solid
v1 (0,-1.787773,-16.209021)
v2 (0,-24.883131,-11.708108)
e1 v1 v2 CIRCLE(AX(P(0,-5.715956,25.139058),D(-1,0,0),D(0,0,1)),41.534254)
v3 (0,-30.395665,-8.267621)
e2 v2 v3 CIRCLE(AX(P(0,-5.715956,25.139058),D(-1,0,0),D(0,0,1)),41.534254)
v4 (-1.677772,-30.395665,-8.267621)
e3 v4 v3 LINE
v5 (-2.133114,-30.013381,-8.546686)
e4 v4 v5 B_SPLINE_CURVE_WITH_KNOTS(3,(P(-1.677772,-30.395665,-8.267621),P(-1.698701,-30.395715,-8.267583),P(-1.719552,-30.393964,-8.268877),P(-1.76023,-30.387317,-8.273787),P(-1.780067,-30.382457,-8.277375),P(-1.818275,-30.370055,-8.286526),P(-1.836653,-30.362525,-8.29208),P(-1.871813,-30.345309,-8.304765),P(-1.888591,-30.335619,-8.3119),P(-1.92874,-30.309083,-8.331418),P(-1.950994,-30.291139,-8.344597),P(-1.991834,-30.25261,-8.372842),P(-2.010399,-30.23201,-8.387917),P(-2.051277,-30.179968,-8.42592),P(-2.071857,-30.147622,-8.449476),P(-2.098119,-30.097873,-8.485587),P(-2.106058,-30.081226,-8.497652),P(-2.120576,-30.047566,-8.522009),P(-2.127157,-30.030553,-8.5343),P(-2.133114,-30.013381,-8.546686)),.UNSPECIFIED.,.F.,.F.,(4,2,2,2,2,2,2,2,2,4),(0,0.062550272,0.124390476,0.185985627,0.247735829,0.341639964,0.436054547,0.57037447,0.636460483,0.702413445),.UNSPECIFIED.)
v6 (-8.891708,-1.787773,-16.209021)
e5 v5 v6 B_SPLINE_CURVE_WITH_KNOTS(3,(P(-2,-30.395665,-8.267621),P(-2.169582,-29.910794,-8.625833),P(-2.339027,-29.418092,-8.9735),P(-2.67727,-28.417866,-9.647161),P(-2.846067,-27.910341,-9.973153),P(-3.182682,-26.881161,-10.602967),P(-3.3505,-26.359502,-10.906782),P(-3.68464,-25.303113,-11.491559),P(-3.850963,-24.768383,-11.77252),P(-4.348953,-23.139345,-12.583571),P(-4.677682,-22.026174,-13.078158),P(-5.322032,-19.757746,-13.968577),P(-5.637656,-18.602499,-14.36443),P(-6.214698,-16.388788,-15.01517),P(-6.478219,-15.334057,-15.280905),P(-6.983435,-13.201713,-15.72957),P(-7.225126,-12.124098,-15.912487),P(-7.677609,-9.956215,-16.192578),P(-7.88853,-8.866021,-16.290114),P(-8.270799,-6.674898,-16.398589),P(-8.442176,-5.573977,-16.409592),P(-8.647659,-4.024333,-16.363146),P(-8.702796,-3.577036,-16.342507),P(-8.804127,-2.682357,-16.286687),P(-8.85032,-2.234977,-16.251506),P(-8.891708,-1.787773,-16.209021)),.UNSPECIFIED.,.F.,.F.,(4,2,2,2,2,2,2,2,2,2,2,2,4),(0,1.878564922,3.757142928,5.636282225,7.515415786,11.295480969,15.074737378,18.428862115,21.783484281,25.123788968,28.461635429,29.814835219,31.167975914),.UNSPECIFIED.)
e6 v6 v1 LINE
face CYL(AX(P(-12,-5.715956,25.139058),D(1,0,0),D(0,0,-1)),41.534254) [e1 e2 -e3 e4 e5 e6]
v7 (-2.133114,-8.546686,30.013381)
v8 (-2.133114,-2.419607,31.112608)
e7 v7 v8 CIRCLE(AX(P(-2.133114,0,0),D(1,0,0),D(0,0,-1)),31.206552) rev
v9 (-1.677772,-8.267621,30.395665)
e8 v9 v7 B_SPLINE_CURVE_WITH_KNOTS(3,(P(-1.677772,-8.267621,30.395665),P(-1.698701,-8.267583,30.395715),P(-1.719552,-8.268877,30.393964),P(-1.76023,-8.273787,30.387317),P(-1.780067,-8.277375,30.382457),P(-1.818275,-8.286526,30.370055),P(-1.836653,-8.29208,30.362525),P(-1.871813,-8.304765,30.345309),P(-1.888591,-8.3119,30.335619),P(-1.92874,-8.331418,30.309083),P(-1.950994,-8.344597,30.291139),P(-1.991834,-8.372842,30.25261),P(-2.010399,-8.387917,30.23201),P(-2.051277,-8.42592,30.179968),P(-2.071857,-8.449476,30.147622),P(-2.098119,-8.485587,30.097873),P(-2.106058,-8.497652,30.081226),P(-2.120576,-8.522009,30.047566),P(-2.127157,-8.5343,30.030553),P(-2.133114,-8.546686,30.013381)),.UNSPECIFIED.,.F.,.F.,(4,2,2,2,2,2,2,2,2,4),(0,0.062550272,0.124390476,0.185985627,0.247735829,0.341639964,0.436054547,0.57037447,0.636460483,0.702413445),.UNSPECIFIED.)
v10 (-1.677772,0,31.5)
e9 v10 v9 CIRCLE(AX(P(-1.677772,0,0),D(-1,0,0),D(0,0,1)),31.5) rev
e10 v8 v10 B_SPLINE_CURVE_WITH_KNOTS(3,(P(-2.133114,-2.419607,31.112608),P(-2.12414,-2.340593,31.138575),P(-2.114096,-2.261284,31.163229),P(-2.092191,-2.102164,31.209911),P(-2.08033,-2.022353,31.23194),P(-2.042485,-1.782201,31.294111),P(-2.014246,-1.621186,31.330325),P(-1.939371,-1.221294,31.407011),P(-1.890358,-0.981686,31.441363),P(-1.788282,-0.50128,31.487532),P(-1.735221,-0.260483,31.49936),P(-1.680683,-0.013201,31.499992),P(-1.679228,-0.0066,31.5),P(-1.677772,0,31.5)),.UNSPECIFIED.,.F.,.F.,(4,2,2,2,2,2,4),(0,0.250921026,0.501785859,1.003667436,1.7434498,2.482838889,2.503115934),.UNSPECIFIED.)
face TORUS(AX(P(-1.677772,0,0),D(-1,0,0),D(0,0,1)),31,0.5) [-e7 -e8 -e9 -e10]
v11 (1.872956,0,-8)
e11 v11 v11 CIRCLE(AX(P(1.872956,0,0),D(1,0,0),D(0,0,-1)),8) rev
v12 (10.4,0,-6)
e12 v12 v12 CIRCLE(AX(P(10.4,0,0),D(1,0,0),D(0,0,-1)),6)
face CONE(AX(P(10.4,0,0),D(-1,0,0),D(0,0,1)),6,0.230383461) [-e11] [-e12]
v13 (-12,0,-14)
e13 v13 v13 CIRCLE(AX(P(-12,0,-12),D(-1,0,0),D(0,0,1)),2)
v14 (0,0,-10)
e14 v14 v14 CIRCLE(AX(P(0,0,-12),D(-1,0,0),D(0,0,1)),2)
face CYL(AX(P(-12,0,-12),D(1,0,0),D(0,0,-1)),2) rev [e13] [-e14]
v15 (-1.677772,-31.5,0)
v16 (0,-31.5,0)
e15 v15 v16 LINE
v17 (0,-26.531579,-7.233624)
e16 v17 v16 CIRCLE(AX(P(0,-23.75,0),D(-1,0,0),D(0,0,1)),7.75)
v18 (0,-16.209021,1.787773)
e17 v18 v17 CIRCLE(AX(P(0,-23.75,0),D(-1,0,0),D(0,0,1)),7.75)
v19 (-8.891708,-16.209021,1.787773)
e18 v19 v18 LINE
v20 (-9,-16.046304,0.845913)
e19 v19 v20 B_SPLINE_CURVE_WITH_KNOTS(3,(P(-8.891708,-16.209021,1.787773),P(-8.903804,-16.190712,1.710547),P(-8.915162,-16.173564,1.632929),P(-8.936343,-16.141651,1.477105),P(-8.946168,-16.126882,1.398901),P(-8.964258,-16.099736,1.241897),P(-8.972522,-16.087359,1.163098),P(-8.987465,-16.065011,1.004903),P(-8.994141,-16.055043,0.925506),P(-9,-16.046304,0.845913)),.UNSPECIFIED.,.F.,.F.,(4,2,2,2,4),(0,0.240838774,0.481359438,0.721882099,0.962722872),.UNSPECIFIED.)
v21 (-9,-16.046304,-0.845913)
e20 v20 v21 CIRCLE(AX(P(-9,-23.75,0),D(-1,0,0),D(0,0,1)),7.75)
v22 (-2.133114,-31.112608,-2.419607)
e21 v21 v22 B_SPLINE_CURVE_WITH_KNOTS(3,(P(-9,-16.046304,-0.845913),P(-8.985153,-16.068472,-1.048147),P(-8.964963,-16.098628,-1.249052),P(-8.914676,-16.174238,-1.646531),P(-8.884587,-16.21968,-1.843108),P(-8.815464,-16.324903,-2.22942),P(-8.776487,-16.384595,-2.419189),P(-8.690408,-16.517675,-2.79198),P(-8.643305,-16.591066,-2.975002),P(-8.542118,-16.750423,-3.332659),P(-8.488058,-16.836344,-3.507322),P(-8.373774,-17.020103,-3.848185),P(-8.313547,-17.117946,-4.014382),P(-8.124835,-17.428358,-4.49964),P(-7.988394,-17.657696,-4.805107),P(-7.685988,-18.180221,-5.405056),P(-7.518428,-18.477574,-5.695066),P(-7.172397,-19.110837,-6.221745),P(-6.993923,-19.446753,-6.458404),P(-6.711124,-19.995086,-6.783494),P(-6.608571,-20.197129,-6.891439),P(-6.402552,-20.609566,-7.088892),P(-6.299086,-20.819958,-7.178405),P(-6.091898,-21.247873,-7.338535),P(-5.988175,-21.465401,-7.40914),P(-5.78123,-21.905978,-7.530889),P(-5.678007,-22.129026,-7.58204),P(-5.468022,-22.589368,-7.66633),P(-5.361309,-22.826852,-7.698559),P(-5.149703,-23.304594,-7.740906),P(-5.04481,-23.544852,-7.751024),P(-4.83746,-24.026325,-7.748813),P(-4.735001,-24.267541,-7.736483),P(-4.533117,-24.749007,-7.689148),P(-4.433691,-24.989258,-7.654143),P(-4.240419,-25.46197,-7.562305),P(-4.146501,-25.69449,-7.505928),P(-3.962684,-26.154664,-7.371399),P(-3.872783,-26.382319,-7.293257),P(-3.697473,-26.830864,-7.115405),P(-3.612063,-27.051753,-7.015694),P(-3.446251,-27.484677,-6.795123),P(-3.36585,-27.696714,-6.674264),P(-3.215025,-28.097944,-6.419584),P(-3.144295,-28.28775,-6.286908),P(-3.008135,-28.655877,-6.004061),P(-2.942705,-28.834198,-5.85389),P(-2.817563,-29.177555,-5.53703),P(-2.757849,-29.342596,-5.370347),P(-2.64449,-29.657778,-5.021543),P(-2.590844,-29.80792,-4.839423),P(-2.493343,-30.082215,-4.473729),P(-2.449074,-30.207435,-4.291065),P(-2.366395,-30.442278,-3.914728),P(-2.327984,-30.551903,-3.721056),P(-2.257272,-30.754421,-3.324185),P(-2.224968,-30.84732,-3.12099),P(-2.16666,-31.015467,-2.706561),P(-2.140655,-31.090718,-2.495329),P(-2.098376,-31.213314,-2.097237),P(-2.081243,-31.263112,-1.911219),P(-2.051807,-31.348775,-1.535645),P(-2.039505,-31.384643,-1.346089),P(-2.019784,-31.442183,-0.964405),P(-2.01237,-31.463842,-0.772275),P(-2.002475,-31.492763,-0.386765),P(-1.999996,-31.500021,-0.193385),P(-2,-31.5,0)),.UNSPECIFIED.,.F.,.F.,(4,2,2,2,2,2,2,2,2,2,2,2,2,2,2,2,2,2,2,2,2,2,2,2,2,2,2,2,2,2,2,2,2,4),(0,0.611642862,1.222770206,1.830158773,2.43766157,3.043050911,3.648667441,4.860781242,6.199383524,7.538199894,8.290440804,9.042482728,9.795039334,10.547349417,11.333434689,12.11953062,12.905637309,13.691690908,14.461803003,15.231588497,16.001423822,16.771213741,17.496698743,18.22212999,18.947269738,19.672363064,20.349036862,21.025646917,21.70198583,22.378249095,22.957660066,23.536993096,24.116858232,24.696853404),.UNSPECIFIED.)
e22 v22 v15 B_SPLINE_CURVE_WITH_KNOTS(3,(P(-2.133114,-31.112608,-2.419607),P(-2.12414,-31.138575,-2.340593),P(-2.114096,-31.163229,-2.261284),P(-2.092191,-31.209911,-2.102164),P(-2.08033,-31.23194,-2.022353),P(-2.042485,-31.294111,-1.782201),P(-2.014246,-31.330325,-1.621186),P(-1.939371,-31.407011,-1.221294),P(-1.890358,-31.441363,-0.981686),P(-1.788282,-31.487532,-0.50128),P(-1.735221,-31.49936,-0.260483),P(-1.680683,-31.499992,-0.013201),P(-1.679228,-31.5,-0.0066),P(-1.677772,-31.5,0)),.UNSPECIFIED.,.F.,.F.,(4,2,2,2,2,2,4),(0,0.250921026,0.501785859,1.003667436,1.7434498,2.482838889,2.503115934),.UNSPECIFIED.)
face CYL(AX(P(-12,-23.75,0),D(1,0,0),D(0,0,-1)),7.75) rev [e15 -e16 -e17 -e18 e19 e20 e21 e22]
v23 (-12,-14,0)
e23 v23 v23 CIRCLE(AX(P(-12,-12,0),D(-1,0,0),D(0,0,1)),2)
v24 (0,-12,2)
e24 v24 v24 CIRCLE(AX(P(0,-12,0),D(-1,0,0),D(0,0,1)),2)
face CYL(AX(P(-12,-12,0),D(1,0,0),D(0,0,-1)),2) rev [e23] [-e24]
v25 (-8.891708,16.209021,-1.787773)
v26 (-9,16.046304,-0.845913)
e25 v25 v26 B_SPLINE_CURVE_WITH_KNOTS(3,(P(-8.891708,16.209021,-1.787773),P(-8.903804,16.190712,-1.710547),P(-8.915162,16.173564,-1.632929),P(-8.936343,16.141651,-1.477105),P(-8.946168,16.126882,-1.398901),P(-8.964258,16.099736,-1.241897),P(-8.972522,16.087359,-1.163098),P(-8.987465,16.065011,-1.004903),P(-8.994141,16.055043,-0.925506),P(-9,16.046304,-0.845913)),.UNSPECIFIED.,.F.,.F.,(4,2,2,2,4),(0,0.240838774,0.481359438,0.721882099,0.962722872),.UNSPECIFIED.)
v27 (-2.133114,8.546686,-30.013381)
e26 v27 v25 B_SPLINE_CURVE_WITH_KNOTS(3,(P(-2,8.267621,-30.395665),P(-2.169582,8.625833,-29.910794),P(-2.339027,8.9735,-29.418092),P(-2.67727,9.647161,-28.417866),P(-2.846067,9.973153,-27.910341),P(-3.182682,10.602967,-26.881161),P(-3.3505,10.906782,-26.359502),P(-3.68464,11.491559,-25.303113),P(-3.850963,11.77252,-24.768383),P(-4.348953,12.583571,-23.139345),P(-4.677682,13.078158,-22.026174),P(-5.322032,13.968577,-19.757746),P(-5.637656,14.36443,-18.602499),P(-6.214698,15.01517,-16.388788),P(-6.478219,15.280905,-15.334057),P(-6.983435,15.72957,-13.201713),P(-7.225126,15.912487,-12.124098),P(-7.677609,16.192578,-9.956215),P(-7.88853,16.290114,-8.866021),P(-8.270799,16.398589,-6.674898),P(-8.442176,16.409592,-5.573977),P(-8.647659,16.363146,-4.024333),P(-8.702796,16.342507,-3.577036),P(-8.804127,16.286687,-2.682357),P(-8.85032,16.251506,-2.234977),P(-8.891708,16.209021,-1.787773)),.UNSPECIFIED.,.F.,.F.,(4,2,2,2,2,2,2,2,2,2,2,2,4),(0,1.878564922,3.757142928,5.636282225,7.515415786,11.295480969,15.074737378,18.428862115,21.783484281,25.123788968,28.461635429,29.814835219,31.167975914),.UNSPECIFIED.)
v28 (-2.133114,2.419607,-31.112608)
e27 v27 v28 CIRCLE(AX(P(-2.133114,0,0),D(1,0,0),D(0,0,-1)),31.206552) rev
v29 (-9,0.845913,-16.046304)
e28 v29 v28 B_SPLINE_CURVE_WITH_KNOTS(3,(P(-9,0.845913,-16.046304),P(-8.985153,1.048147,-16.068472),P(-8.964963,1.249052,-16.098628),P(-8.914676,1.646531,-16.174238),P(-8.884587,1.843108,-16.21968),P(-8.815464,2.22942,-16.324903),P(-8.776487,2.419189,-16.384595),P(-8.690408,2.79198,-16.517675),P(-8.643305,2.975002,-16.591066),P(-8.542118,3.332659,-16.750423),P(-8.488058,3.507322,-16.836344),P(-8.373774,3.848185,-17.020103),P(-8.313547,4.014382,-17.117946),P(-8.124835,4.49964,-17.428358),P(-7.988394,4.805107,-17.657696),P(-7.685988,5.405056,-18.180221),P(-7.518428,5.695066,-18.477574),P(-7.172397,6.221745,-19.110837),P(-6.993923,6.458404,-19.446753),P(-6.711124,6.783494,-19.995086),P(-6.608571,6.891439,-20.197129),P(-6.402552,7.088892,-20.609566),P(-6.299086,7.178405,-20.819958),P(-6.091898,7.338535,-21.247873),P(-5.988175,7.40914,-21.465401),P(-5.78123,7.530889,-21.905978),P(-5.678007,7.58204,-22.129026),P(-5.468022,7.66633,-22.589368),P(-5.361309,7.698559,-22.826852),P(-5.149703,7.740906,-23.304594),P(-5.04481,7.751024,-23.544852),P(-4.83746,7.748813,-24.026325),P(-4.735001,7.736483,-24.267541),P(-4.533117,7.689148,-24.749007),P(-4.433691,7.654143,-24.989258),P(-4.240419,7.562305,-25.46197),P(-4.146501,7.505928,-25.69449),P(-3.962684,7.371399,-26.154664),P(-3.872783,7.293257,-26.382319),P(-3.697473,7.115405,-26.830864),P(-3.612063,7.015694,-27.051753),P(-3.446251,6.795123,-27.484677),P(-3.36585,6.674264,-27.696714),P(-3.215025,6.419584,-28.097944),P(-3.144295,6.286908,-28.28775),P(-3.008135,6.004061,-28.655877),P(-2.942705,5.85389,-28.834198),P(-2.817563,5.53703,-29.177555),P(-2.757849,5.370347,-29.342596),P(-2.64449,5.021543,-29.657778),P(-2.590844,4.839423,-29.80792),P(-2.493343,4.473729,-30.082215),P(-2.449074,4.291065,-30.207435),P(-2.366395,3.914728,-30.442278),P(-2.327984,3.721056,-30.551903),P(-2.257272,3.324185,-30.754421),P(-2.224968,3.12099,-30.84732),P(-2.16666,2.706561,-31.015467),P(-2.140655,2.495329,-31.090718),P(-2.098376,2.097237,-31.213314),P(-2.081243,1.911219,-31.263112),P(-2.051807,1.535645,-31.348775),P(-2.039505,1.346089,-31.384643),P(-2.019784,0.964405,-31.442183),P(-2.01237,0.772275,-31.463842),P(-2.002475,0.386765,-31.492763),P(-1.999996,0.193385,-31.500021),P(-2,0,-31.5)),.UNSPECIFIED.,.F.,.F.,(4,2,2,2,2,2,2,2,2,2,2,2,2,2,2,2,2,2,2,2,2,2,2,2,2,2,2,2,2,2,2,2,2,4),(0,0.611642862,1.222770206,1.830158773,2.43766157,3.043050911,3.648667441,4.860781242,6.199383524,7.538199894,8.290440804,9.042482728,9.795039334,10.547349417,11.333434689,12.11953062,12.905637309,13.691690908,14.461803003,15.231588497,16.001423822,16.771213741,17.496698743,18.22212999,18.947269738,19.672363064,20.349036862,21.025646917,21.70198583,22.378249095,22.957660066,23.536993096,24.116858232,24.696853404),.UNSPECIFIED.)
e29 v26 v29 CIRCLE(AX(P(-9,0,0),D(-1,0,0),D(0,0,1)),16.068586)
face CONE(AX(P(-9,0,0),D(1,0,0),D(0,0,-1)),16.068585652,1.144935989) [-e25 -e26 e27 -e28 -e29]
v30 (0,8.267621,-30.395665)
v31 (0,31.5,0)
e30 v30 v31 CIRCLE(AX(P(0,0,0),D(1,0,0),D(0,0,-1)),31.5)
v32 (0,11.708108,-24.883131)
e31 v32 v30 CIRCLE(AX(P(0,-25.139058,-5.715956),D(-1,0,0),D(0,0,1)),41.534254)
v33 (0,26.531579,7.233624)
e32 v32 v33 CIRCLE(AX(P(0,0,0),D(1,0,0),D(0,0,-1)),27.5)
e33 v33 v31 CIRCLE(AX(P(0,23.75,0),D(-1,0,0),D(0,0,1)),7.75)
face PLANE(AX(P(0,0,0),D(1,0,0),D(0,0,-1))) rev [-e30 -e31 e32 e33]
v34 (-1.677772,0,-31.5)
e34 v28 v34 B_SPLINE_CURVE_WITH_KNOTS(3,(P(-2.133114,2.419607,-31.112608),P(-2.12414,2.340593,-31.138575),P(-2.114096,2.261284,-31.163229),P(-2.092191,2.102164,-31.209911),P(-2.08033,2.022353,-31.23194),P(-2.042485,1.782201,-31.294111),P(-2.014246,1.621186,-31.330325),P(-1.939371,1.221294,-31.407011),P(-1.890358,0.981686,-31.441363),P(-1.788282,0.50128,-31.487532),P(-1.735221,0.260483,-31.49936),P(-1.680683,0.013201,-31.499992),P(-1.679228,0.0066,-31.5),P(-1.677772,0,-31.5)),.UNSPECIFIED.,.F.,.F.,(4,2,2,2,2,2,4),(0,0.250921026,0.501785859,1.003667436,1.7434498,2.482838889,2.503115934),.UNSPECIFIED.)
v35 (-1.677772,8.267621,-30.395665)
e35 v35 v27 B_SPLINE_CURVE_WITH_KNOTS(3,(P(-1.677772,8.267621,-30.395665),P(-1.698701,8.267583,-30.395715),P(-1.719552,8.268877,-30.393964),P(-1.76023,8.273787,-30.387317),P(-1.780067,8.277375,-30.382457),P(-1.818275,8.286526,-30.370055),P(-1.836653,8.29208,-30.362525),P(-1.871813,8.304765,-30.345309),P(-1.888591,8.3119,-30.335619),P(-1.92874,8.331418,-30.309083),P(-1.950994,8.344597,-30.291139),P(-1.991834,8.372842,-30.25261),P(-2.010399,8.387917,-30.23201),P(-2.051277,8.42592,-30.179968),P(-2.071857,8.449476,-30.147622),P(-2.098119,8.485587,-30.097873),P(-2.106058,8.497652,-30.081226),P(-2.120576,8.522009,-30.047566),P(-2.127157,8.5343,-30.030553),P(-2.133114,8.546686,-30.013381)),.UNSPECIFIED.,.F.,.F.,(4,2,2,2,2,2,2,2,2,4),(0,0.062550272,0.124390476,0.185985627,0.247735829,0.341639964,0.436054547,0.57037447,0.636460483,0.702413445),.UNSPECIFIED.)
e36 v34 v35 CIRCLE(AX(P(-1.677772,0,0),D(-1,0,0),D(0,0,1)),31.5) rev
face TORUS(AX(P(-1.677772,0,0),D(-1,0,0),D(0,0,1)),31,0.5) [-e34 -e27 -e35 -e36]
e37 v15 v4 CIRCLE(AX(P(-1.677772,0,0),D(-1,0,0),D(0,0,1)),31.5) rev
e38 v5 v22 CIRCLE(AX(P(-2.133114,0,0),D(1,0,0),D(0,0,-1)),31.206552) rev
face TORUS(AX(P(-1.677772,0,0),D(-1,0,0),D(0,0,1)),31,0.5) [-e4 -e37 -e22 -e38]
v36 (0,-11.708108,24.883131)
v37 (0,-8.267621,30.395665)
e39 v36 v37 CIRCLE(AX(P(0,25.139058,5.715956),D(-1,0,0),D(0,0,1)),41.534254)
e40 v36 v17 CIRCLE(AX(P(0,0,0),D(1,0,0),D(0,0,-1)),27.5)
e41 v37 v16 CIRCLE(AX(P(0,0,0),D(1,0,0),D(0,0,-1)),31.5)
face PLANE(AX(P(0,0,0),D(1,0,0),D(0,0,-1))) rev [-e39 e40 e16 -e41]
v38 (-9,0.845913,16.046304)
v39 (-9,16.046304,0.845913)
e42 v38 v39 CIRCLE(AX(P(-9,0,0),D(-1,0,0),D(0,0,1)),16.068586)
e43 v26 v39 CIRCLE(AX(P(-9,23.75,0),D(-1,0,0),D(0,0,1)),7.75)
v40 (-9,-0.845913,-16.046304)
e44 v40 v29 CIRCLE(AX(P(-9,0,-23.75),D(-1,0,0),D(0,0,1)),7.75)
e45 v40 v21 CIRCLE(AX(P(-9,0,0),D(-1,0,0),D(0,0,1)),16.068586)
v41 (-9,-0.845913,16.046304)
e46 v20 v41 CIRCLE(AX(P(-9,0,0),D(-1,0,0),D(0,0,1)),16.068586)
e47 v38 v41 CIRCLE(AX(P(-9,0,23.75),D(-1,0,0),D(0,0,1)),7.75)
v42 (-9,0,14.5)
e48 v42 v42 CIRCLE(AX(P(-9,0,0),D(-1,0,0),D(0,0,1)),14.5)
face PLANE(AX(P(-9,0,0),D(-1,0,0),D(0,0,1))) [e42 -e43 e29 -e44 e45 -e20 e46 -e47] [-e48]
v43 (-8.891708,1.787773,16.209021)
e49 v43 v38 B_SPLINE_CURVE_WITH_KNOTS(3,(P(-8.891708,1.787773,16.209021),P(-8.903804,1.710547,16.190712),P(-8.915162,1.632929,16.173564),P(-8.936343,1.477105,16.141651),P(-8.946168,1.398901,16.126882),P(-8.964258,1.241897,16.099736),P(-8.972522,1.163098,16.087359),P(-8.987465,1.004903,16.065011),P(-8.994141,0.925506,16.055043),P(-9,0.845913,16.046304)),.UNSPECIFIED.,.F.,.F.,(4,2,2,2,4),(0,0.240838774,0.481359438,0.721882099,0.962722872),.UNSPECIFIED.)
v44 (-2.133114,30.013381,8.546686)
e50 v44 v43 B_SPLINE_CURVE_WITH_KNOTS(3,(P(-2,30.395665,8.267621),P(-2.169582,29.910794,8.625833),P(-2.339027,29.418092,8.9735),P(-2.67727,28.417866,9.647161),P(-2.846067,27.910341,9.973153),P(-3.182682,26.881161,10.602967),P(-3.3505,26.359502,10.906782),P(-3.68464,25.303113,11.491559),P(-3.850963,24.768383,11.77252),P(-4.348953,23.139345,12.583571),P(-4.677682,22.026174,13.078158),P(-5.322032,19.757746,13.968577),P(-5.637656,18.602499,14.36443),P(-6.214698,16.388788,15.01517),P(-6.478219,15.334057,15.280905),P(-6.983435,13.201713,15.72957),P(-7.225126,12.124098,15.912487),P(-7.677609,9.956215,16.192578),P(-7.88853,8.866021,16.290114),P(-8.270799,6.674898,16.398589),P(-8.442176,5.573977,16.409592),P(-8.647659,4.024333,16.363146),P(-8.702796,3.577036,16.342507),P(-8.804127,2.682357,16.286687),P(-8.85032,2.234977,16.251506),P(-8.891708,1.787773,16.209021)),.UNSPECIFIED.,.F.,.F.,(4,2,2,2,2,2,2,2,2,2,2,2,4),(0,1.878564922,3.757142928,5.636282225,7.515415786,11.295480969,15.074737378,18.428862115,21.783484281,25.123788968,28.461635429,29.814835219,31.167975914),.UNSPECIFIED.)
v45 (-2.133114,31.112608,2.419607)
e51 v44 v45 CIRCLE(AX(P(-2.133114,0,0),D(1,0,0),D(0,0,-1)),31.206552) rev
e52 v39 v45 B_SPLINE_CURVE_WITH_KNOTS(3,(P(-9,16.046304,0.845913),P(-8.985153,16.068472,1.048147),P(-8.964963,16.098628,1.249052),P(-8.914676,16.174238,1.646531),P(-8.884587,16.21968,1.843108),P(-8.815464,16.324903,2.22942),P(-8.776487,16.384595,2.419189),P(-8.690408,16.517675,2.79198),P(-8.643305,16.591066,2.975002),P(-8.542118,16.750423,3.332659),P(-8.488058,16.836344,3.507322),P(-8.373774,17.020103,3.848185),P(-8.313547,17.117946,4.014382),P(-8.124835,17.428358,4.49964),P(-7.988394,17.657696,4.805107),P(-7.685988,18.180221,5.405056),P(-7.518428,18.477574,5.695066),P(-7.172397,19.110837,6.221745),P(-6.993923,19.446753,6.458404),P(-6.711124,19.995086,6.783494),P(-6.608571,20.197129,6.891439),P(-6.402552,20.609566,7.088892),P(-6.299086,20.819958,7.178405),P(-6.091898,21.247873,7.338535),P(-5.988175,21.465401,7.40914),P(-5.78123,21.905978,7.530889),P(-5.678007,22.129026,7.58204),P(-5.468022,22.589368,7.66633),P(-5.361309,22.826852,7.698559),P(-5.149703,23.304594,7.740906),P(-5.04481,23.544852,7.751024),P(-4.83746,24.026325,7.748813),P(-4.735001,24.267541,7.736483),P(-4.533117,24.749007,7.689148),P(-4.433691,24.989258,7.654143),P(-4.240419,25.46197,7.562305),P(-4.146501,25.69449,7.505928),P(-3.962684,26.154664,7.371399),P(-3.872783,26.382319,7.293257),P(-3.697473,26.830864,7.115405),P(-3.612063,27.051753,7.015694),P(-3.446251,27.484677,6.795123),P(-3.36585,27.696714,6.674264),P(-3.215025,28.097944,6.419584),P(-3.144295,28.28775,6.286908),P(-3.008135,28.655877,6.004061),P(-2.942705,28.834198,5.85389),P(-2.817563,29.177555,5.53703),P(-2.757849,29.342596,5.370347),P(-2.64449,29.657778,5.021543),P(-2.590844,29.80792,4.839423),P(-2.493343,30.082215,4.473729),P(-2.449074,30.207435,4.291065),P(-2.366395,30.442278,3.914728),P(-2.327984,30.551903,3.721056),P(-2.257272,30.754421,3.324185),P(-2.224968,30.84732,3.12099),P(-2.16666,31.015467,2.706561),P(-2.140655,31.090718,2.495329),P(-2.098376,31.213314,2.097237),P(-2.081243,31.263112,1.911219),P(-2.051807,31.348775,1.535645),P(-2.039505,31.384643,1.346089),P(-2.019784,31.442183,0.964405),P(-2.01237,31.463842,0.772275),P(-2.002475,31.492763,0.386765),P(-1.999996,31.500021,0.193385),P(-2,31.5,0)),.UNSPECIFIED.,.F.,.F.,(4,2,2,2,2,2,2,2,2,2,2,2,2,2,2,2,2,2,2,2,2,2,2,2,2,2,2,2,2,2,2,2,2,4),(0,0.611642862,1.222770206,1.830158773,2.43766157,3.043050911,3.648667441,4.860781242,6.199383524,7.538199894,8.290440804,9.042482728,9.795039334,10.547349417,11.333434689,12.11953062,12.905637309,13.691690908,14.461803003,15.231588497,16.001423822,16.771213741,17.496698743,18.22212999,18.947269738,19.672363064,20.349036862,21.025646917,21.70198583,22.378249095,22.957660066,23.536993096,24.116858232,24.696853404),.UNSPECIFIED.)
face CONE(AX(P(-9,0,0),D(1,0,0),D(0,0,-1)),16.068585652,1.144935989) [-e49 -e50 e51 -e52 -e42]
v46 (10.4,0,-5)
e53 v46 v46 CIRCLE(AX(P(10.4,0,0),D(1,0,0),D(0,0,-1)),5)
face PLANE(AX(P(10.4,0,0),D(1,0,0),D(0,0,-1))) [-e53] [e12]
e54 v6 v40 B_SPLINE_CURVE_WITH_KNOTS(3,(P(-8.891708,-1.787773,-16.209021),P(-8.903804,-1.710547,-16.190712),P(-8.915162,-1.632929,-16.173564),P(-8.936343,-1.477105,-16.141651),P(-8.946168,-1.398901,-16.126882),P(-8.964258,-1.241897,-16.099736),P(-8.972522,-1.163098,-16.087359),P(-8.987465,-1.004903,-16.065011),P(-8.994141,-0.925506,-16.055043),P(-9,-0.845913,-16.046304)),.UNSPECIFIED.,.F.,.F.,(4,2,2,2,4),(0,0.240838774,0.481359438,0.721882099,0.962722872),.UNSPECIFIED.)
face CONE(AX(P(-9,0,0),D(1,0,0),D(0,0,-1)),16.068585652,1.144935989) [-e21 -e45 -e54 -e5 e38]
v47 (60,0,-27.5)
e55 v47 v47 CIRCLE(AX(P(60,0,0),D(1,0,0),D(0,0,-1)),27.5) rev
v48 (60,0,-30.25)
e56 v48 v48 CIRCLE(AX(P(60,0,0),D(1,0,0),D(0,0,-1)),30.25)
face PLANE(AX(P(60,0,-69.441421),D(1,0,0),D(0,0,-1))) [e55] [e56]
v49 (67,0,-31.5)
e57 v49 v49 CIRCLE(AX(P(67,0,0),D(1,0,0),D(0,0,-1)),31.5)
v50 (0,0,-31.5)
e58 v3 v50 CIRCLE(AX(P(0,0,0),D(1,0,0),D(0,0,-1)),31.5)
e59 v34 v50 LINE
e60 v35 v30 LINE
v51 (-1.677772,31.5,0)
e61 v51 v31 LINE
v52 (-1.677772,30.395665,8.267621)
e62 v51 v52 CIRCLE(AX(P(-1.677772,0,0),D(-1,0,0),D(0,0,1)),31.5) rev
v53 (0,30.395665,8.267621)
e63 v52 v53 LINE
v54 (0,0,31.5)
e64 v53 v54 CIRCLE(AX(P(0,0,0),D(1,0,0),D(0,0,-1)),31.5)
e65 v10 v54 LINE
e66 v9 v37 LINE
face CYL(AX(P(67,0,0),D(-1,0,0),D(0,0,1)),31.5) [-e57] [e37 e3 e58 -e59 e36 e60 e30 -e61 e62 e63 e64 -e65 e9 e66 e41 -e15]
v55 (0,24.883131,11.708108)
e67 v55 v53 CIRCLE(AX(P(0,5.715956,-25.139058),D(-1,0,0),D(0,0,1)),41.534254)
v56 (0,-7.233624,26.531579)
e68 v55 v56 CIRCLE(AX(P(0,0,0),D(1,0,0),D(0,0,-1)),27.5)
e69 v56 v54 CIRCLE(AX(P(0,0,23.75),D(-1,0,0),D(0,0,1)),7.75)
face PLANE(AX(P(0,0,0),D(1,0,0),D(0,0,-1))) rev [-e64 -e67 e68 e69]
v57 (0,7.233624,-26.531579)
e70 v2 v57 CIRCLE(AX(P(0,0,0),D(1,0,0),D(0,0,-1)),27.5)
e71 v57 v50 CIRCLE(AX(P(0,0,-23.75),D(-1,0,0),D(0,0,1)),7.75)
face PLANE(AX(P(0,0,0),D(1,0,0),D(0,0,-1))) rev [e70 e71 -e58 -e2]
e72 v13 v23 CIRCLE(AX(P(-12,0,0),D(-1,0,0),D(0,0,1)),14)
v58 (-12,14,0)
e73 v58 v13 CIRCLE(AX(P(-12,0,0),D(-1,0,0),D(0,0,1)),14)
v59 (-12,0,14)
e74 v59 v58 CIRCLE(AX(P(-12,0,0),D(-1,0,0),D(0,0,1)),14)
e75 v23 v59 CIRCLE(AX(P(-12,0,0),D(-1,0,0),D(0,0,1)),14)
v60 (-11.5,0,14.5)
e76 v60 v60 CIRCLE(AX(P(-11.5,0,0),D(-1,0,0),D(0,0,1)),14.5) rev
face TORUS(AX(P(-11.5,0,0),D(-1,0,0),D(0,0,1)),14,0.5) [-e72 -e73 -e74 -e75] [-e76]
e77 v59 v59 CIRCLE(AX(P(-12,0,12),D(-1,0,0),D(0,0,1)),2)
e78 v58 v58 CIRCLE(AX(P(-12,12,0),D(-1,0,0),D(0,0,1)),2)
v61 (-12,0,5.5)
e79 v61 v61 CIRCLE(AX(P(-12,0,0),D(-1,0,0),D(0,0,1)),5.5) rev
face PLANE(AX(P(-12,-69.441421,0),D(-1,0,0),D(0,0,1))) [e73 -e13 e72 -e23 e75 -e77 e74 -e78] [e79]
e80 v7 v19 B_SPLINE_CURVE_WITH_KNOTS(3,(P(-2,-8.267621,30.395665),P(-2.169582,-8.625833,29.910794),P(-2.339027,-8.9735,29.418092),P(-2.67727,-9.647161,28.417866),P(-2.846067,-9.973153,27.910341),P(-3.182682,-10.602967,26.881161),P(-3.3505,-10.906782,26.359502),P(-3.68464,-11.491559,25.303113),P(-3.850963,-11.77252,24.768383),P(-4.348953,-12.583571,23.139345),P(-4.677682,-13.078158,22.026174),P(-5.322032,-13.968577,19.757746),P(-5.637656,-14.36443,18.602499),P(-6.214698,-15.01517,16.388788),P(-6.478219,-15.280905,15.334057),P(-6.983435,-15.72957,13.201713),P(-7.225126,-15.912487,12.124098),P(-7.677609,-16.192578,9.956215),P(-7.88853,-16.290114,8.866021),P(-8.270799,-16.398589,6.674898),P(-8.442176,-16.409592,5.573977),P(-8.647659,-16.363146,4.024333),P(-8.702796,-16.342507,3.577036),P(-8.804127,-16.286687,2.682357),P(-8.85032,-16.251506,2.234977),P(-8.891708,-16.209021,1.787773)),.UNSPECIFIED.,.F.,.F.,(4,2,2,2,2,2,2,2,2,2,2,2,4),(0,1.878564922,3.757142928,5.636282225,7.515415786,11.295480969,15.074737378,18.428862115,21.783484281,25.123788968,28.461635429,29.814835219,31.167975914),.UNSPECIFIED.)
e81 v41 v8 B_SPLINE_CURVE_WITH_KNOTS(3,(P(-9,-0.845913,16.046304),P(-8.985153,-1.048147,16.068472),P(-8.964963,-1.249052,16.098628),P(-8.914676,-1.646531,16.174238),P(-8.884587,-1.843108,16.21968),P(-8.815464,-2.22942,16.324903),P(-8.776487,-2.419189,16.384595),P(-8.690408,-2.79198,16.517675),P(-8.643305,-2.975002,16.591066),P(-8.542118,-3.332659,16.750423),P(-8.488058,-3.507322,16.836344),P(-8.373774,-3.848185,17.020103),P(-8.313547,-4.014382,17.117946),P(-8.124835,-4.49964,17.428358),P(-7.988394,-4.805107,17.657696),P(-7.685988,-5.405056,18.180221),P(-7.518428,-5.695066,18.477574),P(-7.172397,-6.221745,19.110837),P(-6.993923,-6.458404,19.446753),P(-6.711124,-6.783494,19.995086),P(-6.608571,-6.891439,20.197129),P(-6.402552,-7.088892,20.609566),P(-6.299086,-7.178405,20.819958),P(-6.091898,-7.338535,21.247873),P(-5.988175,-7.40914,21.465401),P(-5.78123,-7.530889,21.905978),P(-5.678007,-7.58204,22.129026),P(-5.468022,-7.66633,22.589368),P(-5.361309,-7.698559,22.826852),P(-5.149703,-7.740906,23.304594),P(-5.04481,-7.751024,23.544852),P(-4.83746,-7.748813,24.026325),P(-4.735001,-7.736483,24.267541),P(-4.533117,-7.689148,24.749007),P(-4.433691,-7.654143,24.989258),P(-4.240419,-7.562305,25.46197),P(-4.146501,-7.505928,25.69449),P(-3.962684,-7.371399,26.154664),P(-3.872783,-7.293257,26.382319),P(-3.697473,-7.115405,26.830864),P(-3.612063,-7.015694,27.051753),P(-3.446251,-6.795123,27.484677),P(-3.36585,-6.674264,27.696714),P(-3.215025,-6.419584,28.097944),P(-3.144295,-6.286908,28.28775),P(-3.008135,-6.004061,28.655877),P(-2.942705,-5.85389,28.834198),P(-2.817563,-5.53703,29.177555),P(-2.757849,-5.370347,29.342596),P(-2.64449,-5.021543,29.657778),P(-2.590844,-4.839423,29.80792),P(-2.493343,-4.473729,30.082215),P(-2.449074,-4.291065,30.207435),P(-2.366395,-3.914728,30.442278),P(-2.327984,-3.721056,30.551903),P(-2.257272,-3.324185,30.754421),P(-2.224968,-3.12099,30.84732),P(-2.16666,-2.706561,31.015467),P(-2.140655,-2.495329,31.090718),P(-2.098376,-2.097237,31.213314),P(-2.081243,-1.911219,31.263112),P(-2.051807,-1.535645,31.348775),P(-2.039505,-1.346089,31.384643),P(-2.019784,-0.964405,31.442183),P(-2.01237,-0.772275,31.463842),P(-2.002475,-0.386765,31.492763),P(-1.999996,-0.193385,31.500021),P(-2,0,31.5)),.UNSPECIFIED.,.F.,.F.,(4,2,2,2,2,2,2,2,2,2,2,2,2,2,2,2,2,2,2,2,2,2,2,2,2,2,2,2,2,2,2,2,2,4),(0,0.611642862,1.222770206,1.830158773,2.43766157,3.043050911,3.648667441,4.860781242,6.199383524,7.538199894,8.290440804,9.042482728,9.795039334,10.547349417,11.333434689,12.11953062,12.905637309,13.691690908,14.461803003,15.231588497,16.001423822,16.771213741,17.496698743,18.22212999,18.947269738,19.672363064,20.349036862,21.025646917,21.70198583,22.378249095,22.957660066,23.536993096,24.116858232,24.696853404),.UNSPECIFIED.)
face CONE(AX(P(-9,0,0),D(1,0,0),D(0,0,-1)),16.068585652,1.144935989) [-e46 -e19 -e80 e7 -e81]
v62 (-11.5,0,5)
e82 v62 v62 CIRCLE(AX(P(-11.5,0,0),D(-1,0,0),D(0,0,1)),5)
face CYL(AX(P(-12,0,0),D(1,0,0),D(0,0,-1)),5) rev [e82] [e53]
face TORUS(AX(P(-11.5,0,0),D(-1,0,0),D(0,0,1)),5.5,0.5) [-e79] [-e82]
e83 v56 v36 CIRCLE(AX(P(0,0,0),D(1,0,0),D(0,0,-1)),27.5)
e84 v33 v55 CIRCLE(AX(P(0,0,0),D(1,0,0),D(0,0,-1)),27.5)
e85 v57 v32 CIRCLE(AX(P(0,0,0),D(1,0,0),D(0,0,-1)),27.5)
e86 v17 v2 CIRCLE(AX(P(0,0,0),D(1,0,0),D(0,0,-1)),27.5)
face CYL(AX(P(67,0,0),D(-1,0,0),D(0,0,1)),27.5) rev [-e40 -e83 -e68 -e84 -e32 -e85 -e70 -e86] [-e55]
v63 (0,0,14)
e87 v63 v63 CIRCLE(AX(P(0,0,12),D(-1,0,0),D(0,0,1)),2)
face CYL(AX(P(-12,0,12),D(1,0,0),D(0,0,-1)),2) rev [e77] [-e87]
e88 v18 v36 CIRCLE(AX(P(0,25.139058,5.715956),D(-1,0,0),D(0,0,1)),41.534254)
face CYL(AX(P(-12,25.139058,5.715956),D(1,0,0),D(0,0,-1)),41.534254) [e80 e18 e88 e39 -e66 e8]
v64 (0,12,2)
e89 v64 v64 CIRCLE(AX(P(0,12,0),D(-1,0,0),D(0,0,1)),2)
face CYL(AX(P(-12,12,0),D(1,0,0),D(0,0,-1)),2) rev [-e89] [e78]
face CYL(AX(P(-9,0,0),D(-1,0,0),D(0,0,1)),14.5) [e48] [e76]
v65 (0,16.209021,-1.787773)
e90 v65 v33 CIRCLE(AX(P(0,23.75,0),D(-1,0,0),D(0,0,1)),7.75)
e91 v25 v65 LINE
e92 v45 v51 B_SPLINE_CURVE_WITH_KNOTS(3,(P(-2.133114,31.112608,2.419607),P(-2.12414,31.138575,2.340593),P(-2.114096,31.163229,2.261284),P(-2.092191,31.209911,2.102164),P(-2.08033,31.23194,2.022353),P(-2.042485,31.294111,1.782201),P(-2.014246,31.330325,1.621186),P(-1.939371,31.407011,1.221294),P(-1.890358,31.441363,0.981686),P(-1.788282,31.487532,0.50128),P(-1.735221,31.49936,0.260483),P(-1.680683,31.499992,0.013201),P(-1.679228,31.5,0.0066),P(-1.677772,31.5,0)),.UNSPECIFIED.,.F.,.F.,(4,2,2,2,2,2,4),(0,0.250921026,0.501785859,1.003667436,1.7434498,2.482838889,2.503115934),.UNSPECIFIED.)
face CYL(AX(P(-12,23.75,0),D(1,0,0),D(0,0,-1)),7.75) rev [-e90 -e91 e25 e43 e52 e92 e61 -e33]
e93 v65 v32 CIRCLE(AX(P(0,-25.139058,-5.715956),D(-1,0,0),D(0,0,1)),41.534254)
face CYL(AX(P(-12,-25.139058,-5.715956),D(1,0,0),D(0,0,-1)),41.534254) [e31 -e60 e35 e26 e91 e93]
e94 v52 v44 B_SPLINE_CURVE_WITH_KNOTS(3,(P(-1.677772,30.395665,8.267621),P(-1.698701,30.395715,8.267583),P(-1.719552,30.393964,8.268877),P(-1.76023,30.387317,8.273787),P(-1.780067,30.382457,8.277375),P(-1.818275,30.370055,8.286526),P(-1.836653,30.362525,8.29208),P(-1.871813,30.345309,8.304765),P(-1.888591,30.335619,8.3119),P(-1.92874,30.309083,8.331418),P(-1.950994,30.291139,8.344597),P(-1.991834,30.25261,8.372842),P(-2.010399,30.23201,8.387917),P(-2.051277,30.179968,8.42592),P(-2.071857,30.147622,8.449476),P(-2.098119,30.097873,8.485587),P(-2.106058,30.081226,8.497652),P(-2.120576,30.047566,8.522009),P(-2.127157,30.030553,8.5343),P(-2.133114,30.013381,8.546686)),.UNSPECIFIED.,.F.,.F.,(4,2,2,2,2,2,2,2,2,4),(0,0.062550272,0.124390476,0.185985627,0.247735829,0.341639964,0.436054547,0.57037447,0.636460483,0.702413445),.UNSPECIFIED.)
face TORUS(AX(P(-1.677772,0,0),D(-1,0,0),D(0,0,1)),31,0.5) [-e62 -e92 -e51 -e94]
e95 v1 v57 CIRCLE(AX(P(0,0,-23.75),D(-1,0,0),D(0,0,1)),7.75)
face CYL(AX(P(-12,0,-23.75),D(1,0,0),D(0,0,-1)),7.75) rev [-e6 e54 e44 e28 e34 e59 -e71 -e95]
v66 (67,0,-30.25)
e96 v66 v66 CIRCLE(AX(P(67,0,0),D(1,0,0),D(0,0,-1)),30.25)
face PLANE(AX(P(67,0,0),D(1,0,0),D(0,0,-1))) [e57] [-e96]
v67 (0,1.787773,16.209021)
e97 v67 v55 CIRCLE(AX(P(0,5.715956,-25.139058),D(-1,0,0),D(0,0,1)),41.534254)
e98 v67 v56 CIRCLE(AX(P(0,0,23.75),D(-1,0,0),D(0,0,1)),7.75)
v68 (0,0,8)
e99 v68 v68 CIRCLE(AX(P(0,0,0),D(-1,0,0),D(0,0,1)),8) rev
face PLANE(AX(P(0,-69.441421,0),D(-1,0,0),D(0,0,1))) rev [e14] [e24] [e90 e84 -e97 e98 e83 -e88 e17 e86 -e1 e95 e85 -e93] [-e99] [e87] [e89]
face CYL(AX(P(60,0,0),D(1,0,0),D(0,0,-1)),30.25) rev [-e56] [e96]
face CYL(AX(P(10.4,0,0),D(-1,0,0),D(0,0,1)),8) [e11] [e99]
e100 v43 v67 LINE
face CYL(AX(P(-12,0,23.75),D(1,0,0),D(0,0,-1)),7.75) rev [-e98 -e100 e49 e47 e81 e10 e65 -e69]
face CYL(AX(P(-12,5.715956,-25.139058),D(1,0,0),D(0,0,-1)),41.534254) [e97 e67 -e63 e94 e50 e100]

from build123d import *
from OCP.BRepFilletAPI import BRepFilletAPI_MakeChamfer
from build123d.topology import SkipClean

# Parameters (mm, degrees)
SKETCH1_R      = 31.5
SKETCH1_R_2    = 27.5
EXTRUDE1_DEPTH = 67
EXTRUDE2_START = 12
SKETCH2_R      = 2
SKETCH2_R_2    = 5
EXTRUDE2_DEPTH = 12
SKETCH3_R      = 31.5
SKETCH3_R_2    = 14.5
EXTRUDE3_DEPTH = 3
CHAMFER1_SIZE  = 7
CHAMFER1_SIZE2 = 15.431414348
FILLET1_R      = 0.5
EXTRUDE4_START = -7
SKETCH4_R      = 30.25
SKETCH4_R_2    = 27.5
EXTRUDE4_DEPTH = 7
SKETCH5_R      = 8
SKETCH5_R_2    = 5
EXTRUDE5_DEPTH = 10.4
CHAMFER2_SIZE  = 2
CHAMFER2_SIZE2 = 8.527043513


with BuildPart() as part:
    # Sketch1 → Extrude1 (new body)
    with BuildSketch(Plane(origin=(0, 0, 0), x_dir=(0, 0, -1), z_dir=(1, 0, 0))):
        Circle(SKETCH1_R)
        Circle(SKETCH1_R_2, mode=Mode.SUBTRACT)
    extrude(amount=EXTRUDE1_DEPTH)

    # Sketch2 → Extrude2 (add)
    with SkipClean():  # the faces are left unmerged after this step: merging them gives an invalid solid
        with BuildSketch(Plane.ZY.offset(EXTRUDE2_START)):
            with BuildLine():
                ThreePointArc((30.395664911, -8.267620856), (31.222695629, -4.170524865), (31.5, 0))
                ThreePointArc((31.5, 0), (22.850024535, -7.697567419), (16.209020861, 1.787773372))
                ThreePointArc((16.209020861, 1.787773372), (14.881827956, 16.825542788), (8.267620856, 30.395664911))
                ThreePointArc((8.267620856, 30.395664911), (4.170524844, 31.222695632), (-4.4e-08, 31.5))
                ThreePointArc((-4.4e-08, 31.5), (7.697567421, 22.850024557), (-1.787773372, 16.209020861))
                ThreePointArc((-1.787773372, 16.209020861), (-16.825542788, 14.881827956), (-30.395664911, 8.267620856))
                ThreePointArc((-30.395664911, 8.267620856), (-31.222695632, 4.170524843), (-31.5, -4.4e-08))
                ThreePointArc((-31.5, -4.4e-08), (-22.850024557, 7.697567421), (-16.209020861, -1.787773372))
                ThreePointArc((-16.209020861, -1.787773372), (-14.881827956, -16.825542788), (-8.267620856, -30.395664911))
                ThreePointArc((-8.267620856, -30.395664911), (-4.170524825, -31.222695635), (8.1e-08, -31.5))
                ThreePointArc((8.1e-08, -31.5), (-7.697567423, -22.850024575), (1.787773372, -16.209020861))
                ThreePointArc((1.787773372, -16.209020861), (16.825542788, -14.881827956), (30.395664911, -8.267620856))
            make_face()
            with Locations((0, 12)):
                Circle(SKETCH2_R, mode=Mode.SUBTRACT)
            with Locations((0, -12)):
                Circle(SKETCH2_R, mode=Mode.SUBTRACT)
            with Locations((12, 0)):
                Circle(SKETCH2_R, mode=Mode.SUBTRACT)
            with Locations((-12, 0)):
                Circle(SKETCH2_R, mode=Mode.SUBTRACT)
            Circle(SKETCH2_R_2, mode=Mode.SUBTRACT)
        extrude(amount=-EXTRUDE2_DEPTH)

    # Sketch3 → Extrude3 (cut)
    with SkipClean():  # the faces are left unmerged after this step: merging them gives an invalid solid
        with BuildSketch(Plane.ZY.offset(12)):
            with Locations(Location((0, 0, 0), (0, 0, 180))):
                Circle(SKETCH3_R)
            Circle(SKETCH3_R_2, mode=Mode.SUBTRACT)
        extrude(amount=-EXTRUDE3_DEPTH, mode=Mode.SUBTRACT)

    # Chamfer1: one chamfer whose edges measure the first distance from different faces: ONE call of the kernel's chamfer builder (chamfer() names one face for all edges)
    chamfer1_edges_1 = [part.edges().sort_by_distance(p)[0] for p in [
        (-9, 31.222695632, 4.170524844),
    ]]
    chamfer1_side_1 = [part.faces().sort_by_distance(p)[0] for p in [
        (-4.5, 31.222695632, 4.170524844),
    ]]
    chamfer1_edges_2 = [part.edges().sort_by_distance(p)[0] for p in [
        (-9, -4.170524865, 31.222695629),
    ]]
    chamfer1_side_2 = [part.faces().sort_by_distance(p)[0] for p in [
        (-4.5, -4.170524865, 31.222695629),
    ]]
    chamfer1_edges_3 = [part.edges().sort_by_distance(p)[0] for p in [
        (-9, -31.222695635, -4.170524825),
    ]]
    chamfer1_side_3 = [part.faces().sort_by_distance(p)[0] for p in [
        (-4.5, -31.222695635, -4.170524825),
    ]]
    chamfer1_edges_4 = [part.edges().sort_by_distance(p)[0] for p in [
        (-9, 4.170524865, -31.222695629),
    ]]
    chamfer1_side_4 = [part.faces().sort_by_distance(p)[0] for p in [
        (-4.5, 4.170524843, -31.222695632),
    ]]
    chamfer1 = BRepFilletAPI_MakeChamfer(part.part.solid().wrapped)
    for e in chamfer1_edges_1:
        chamfer1.Add(CHAMFER1_SIZE, CHAMFER1_SIZE2, e.wrapped, chamfer1_side_1[0].wrapped)  # the first distance lies on this face
    for e in chamfer1_edges_2:
        chamfer1.Add(CHAMFER1_SIZE, CHAMFER1_SIZE2, e.wrapped, chamfer1_side_2[0].wrapped)  # the first distance lies on this face
    for e in chamfer1_edges_3:
        chamfer1.Add(CHAMFER1_SIZE, CHAMFER1_SIZE2, e.wrapped, chamfer1_side_3[0].wrapped)  # the first distance lies on this face
    for e in chamfer1_edges_4:
        chamfer1.Add(CHAMFER1_SIZE, CHAMFER1_SIZE2, e.wrapped, chamfer1_side_4[0].wrapped)  # the first distance lies on this face
    add(Compound.cast(chamfer1.Shape()), mode=Mode.REPLACE)

    # Fillet1
    fillet1_edges = [part.edges().sort_by_distance(p)[0] for p in [
        (-2, 4.170524843, -31.222695632),
        (-2, 31.222695632, 4.170524844),
        (-2, -31.222695635, -4.170524825),
        (-2, -4.170524865, 31.222695629),
        (-12, 0, -5),
        (-12, 0, -14.5),
    ]]
    fillet(fillet1_edges, radius=FILLET1_R - 0.0001)  # a hair under: the kernel refuses the full size

    # Sketch4 → Extrude4 (cut)
    with BuildSketch(Plane(origin=(67, 0, 0), x_dir=(0, 0, -1), z_dir=(1, 0, 0)).offset(EXTRUDE4_START)):
        Circle(SKETCH4_R)
        with Locations(Location((0, 0, 0), (0, 0, 195.250573932))):
            Circle(SKETCH4_R_2, mode=Mode.SUBTRACT)
    extrude(amount=EXTRUDE4_DEPTH, mode=Mode.SUBTRACT)

    # Sketch5 → Extrude5 (add)
    with SkipClean():  # the faces are left unmerged after this step: merging them gives an invalid solid
        with BuildSketch(Plane(origin=(0, 0, 0), x_dir=(0, 0, -1), z_dir=(1, 0, 0))):
            with Locations(Location((0, 0, 0), (0, 0, 180))):
                Circle(SKETCH5_R)
            Circle(SKETCH5_R_2, mode=Mode.SUBTRACT)
        extrude(amount=EXTRUDE5_DEPTH)
    add(part.part.scale(1), mode=Mode.REPLACE)  # the faces are merged on a copy

    # Chamfer2
    chamfer2_edges = [part.edges().sort_by_distance(p)[0] for p in [
        (10.4, 0, -8),
    ]]
    chamfer2_side = [part.faces().sort_by_distance(p)[0] for p in [
        (10.4, 0, -7.77372583),
    ]]
    chamfer(chamfer2_edges, length=CHAMFER2_SIZE, length2=CHAMFER2_SIZE2, reference=chamfer2_side[0])


solid = part.part
